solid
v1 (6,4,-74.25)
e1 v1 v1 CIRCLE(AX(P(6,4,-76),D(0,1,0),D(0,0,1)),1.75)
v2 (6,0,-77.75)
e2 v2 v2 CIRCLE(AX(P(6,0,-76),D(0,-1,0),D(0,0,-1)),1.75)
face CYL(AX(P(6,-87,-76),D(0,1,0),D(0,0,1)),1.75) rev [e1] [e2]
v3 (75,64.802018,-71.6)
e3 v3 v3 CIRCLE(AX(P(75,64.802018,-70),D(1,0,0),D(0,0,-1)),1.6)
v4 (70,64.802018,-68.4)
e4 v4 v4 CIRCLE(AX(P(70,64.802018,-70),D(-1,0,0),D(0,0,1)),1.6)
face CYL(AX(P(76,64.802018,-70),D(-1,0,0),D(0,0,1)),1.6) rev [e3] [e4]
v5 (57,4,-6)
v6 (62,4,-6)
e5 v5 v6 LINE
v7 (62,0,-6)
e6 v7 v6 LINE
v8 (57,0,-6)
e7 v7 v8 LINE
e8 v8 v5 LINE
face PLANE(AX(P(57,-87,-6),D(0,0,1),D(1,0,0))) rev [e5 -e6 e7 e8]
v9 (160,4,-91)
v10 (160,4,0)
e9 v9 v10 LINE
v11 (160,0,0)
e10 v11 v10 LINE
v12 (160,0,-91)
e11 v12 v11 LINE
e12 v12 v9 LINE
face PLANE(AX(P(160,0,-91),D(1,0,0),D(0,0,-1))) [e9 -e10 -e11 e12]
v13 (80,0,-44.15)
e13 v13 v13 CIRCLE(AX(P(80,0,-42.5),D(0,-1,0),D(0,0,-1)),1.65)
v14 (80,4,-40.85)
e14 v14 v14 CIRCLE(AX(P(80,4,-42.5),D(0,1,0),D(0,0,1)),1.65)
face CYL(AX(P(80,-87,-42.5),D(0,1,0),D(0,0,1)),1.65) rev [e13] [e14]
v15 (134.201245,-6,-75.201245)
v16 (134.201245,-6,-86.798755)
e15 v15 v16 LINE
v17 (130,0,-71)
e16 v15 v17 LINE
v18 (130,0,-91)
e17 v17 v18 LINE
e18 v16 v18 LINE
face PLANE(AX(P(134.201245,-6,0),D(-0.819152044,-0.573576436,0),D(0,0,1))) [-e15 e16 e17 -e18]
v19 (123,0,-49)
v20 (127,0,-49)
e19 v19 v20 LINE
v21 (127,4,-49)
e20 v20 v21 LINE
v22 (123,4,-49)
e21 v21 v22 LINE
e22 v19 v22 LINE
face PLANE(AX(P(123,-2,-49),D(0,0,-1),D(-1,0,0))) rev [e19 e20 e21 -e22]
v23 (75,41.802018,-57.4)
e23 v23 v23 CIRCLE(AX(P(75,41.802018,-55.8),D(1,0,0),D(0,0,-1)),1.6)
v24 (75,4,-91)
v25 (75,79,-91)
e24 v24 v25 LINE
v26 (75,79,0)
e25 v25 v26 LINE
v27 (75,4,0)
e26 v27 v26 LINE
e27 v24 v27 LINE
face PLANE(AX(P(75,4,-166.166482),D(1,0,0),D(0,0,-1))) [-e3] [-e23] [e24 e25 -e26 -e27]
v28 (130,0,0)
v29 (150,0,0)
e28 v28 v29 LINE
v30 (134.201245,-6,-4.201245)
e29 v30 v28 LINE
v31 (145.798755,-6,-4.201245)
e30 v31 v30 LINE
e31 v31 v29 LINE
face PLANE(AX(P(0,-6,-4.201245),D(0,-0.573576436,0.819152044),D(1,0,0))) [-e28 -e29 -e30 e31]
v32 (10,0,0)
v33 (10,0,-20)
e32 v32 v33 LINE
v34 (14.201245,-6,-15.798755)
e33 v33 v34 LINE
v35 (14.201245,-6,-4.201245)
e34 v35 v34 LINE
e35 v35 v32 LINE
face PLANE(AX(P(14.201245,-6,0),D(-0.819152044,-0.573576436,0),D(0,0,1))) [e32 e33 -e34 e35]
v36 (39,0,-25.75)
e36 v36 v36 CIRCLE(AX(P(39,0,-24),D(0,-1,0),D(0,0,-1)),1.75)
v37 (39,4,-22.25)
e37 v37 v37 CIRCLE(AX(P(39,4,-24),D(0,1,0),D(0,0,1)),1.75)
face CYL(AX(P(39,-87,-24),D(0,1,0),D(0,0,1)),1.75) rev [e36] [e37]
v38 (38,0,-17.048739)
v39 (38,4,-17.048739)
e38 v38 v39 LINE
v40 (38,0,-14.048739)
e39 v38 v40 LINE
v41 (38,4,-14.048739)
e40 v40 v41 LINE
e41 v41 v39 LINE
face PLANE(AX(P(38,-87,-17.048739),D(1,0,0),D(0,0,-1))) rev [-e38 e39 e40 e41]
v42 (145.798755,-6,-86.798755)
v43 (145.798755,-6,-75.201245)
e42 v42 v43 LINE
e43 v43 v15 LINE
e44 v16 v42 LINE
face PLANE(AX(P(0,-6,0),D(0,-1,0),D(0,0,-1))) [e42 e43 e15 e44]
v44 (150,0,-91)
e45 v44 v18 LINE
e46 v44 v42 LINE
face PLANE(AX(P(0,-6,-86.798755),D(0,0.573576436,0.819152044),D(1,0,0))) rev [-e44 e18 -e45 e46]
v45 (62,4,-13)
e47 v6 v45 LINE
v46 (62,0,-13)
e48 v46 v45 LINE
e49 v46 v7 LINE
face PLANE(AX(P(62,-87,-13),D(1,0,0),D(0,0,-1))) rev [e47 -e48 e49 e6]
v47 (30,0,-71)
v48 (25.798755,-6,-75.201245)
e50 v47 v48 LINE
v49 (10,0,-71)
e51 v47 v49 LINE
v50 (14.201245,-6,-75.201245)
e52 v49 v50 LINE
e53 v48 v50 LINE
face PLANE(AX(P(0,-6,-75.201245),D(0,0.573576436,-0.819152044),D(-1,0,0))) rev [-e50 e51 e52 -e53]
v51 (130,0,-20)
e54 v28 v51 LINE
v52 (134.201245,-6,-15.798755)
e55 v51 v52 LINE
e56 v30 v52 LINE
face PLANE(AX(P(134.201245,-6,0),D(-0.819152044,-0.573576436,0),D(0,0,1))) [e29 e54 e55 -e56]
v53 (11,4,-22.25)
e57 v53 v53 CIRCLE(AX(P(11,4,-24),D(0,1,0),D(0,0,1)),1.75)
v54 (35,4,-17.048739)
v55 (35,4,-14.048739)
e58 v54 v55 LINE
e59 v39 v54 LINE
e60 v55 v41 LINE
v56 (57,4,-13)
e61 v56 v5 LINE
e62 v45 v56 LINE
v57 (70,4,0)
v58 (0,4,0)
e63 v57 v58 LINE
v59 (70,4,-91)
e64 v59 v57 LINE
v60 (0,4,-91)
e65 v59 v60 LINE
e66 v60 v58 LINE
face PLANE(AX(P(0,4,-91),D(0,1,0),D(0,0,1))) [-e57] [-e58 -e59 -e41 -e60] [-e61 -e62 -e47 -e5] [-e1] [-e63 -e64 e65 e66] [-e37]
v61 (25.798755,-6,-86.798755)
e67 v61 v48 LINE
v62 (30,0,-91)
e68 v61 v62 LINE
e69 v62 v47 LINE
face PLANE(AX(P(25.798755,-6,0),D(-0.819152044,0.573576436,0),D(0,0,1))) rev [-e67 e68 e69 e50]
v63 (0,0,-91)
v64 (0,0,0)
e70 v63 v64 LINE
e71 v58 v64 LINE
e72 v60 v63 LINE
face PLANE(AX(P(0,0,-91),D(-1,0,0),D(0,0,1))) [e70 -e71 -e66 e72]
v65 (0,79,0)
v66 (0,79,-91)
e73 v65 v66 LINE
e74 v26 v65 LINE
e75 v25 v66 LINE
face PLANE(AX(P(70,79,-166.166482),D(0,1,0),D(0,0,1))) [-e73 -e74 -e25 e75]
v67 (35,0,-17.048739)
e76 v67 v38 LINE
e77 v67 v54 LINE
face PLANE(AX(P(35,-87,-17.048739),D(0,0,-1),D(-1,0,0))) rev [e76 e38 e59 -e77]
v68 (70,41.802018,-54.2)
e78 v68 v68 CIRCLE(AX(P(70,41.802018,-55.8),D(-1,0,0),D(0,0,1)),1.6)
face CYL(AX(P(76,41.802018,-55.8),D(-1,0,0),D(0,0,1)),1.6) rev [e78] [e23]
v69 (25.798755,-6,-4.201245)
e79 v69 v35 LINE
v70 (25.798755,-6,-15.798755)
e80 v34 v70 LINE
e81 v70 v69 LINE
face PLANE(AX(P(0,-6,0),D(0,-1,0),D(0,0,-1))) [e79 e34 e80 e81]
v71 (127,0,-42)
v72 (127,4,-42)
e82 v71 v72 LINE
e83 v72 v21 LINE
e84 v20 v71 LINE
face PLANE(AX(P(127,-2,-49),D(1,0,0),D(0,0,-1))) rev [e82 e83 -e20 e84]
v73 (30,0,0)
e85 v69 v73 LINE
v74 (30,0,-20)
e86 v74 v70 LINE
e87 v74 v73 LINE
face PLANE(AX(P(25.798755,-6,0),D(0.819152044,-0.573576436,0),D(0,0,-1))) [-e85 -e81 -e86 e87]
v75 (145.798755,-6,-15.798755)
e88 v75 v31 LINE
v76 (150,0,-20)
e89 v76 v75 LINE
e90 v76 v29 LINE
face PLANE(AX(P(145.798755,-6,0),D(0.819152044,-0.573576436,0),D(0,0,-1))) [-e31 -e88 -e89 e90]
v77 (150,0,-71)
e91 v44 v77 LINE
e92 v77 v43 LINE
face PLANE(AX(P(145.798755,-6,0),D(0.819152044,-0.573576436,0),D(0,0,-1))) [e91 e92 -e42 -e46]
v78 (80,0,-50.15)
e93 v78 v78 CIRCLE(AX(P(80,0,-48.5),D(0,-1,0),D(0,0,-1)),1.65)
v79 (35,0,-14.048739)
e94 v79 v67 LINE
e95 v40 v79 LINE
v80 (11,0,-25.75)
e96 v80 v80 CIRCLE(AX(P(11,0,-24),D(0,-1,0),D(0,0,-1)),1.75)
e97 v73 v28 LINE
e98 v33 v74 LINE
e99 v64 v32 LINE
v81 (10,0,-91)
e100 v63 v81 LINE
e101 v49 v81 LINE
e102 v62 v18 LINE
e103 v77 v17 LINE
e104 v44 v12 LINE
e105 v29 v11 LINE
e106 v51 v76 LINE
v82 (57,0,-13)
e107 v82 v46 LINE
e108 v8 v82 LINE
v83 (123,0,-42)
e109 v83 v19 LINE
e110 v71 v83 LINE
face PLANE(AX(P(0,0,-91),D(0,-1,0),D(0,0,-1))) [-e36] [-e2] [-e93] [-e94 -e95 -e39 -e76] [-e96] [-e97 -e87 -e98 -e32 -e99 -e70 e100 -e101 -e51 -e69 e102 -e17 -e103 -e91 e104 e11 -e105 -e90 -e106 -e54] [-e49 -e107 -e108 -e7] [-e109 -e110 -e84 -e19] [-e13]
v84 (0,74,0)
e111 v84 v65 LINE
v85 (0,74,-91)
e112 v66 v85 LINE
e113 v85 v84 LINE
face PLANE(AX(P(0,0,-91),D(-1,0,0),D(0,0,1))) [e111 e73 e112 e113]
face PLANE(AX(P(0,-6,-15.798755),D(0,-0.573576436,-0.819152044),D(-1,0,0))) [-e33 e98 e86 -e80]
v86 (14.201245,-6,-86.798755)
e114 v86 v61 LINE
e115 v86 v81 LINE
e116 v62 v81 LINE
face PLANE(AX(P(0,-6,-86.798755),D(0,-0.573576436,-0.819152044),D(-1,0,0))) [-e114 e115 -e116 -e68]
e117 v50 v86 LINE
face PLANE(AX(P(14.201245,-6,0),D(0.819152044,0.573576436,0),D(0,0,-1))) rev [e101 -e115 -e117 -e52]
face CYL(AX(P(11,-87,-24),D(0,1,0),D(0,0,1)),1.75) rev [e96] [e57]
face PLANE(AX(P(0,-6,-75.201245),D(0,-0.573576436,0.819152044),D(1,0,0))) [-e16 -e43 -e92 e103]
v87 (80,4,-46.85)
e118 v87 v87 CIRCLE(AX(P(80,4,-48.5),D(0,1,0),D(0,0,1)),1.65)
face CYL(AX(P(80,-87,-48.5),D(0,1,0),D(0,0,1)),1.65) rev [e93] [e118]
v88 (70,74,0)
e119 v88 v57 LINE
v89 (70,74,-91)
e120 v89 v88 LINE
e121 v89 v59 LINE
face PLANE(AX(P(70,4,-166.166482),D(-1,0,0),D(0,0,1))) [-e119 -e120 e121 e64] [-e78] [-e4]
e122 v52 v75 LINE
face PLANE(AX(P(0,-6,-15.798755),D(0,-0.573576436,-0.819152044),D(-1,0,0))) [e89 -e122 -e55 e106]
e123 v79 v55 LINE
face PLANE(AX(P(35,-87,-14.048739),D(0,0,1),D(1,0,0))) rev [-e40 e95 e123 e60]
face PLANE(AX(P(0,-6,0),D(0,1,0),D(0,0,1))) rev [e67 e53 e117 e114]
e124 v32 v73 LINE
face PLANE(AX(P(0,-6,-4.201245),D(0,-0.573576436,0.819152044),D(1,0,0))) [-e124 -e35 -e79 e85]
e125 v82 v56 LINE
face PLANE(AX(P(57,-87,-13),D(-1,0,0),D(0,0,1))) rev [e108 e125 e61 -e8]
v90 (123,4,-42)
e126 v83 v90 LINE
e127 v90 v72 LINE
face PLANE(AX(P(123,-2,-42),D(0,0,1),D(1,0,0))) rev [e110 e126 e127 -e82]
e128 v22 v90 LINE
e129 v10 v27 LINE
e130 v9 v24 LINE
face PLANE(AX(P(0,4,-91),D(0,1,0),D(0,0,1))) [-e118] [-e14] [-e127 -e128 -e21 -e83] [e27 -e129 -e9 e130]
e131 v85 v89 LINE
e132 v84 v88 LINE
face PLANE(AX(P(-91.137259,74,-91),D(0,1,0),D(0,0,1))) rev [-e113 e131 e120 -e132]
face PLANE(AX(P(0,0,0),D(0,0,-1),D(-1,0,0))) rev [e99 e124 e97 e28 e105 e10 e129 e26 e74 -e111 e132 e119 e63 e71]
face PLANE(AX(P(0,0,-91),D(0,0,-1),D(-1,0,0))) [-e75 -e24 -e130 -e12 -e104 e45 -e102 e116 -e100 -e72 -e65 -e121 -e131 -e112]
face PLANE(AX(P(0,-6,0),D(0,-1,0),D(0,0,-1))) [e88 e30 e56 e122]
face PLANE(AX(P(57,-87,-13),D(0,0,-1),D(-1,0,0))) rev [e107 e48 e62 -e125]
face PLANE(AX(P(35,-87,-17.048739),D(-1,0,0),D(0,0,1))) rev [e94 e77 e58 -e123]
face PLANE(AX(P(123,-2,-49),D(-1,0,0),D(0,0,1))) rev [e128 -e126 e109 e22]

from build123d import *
from OCP.BRepFilletAPI import BRepFilletAPI_MakeChamfer

# Parameters (mm, degrees)
SKETCH1_W           = 160
SKETCH1_H           = 4
BOSS_EXTRUDE1_DEPTH = 91
SKETCH2_W           = 5
SKETCH2_H           = 75
BOSS_EXTRUDE2_DEPTH = 91
SKETCH3_W           = 91
SKETCH3_H           = 5
BOSS_EXTRUDE3_DEPTH = 70
SKETCH4_W           = 5
SKETCH4_H           = 7
CUT_EXTRUDE1_DEPTH  = 91
SKETCH5_R           = 1.75
CUT_EXTRUDE2_DEPTH  = 91
SKETCH6_W           = 3
SKETCH6_H           = 3
CUT_EXTRUDE3_DEPTH  = 91
SKETCH7_R           = 1.65
CUT_EXTRUDE4_DEPTH  = 91
SKETCH8_W           = 20
SKETCH8_H           = 20
BOSS_EXTRUDE4_DEPTH = 6
CHAMFER1_SIZE       = 6
CHAMFER1_SIZE_2     = 4.201245229
SKETCH9_W           = 20
SKETCH9_H           = 20
BOSS_EXTRUDE5_DEPTH = 6
CHAMFER2_SIZE       = 6
CHAMFER2_SIZE_2     = 4.201245229
SKETCH10_W          = 4
SKETCH10_H          = 7
CUT_EXTRUDE5_DEPTH  = 6
SKETCH11_R          = 1.6
CUT_EXTRUDE6_DEPTH  = 6


with BuildPart() as part:
    # Sketch1 → Boss-Extrude1 (new body)
    with BuildSketch(Plane.XY):
        with Locations((80, 2)):
            Rectangle(SKETCH1_W, SKETCH1_H)
    extrude(amount=-BOSS_EXTRUDE1_DEPTH)

    # Sketch2 → Boss-Extrude2 (add)
    with BuildSketch(Plane.XY):
        with Locations((72.5, 41.5)):
            Rectangle(SKETCH2_W, SKETCH2_H)
    extrude(amount=-BOSS_EXTRUDE2_DEPTH)

    # Sketch3 → Boss-Extrude3 (add)
    with BuildSketch(Plane.ZY.offset(-70)):
        with Locations((-45.5, 76.5)):
            Rectangle(SKETCH3_W, SKETCH3_H)
    extrude(amount=BOSS_EXTRUDE3_DEPTH)

    # Sketch4 → Cut-Extrude1 (cut)
    with BuildSketch(Plane(origin=(0, 4, 0), x_dir=(1, 0, 0), z_dir=(0, 1, 0))):
        with Locations((59.5, 9.5)):
            Rectangle(SKETCH4_W, SKETCH4_H)
    extrude(amount=-CUT_EXTRUDE1_DEPTH, mode=Mode.SUBTRACT)

    # Sketch5 → Cut-Extrude2 (cut)
    with BuildSketch(Plane(origin=(0, 4, 0), x_dir=(1, 0, 0), z_dir=(0, 1, 0))):
        with Locations(Location((11, 24, 0), (0, 0, 270))):
            Circle(SKETCH5_R)
        with Locations(Location((39, 24, 0), (0, 0, 270))):
            Circle(SKETCH5_R)
        with Locations(Location((6, 76, 0), (0, 0, 270))):
            Circle(SKETCH5_R)
    extrude(amount=-CUT_EXTRUDE2_DEPTH, mode=Mode.SUBTRACT)

    # Sketch6 → Cut-Extrude3 (cut)
    with BuildSketch(Plane(origin=(0, 4, 0), x_dir=(1, 0, 0), z_dir=(0, 1, 0))):
        with Locations((36.5, 15.548738613)):
            Rectangle(SKETCH6_W, SKETCH6_H)
    extrude(amount=-CUT_EXTRUDE3_DEPTH, mode=Mode.SUBTRACT)

    # Sketch7 → Cut-Extrude4 (cut)
    with BuildSketch(Plane(origin=(0, 4, 0), x_dir=(1, 0, 0), z_dir=(0, 1, 0))):
        with Locations(Location((80, 48.5, 0), (0, 0, 270))):
            Circle(SKETCH7_R)
        with Locations(Location((80, 42.5, 0), (0, 0, 270))):
            Circle(SKETCH7_R)
    extrude(amount=-CUT_EXTRUDE4_DEPTH, mode=Mode.SUBTRACT)

    # Sketch8 → Boss-Extrude4 (add)
    with BuildSketch(Plane.XZ):
        with Locations((20, -10)):
            Rectangle(SKETCH8_W, SKETCH8_H)
    extrude(amount=BOSS_EXTRUDE4_DEPTH)

    # Chamfer1
    chamfer1_edges_1 = [part.edges().sort_by_distance(p)[0] for p in [
        (30, -6, -10),
    ]]
    chamfer1_side_1 = [part.faces().sort_by_distance(p)[0] for p in [
        (30, -5.915975095, -10),
    ]]
    chamfer1_edges_2 = [part.edges().sort_by_distance(p)[0] for p in [
        (20, -6, -20),
    ]]
    chamfer1_side_2 = [part.faces().sort_by_distance(p)[0] for p in [
        (20, -5.915975095, -20),
    ]]
    chamfer1_edges_3 = [part.edges().sort_by_distance(p)[0] for p in [
        (10, -6, -10),
    ]]
    chamfer1_side_3 = [part.faces().sort_by_distance(p)[0] for p in [
        (10, -5.915975095, -10),
    ]]
    chamfer1_edges_4 = [part.edges().sort_by_distance(p)[0] for p in [
        (20, -6, 0),
    ]]
    chamfer1_side_4 = [part.faces().sort_by_distance(p)[0] for p in [
        (20, -5.915975095, 0),
    ]]
    chamfer1 = BRepFilletAPI_MakeChamfer(part.part.solid().wrapped)
    for e in chamfer1_edges_1:
        chamfer1.Add(CHAMFER1_SIZE - 0.0001, CHAMFER1_SIZE_2 - 0.0001, e.wrapped, chamfer1_side_1[0].wrapped)
    for e in chamfer1_edges_2:
        chamfer1.Add(CHAMFER1_SIZE - 0.0001, CHAMFER1_SIZE_2 - 0.0001, e.wrapped, chamfer1_side_2[0].wrapped)
    for e in chamfer1_edges_3:
        chamfer1.Add(CHAMFER1_SIZE - 0.0001, CHAMFER1_SIZE_2 - 0.0001, e.wrapped, chamfer1_side_3[0].wrapped)
    for e in chamfer1_edges_4:
        chamfer1.Add(CHAMFER1_SIZE - 0.0001, CHAMFER1_SIZE_2 - 0.0001, e.wrapped, chamfer1_side_4[0].wrapped)
    add(Compound.cast(chamfer1.Shape()), mode=Mode.REPLACE)  # a hair under: the kernel refuses the full size

    # Sketch9 → Boss-Extrude5 (add)
    with BuildSketch(Plane.XZ):
        with Locations((20, -81)):
            Rectangle(SKETCH9_W, SKETCH9_H)
        with Locations((140, -81)):
            Rectangle(SKETCH9_W, SKETCH9_H)
        with Locations((140, -10)):
            Rectangle(SKETCH9_W, SKETCH9_H)
    extrude(amount=BOSS_EXTRUDE5_DEPTH)

    # Chamfer2
    chamfer2_edges_1 = [part.edges().sort_by_distance(p)[0] for p in [
        (30, -6, -81),
    ]]
    chamfer2_side_1 = [part.faces().sort_by_distance(p)[0] for p in [
        (30, -5.915975095, -81),
    ]]
    chamfer2_edges_2 = [part.edges().sort_by_distance(p)[0] for p in [
        (20, -6, -91),
    ]]
    chamfer2_side_2 = [part.faces().sort_by_distance(p)[0] for p in [
        (20, -5.915975095, -91),
    ]]
    chamfer2_edges_3 = [part.edges().sort_by_distance(p)[0] for p in [
        (140, -6, -91),
    ]]
    chamfer2_side_3 = [part.faces().sort_by_distance(p)[0] for p in [
        (140, -5.915975095, -91),
    ]]
    chamfer2_edges_4 = [part.edges().sort_by_distance(p)[0] for p in [
        (10, -6, -81),
    ]]
    chamfer2_side_4 = [part.faces().sort_by_distance(p)[0] for p in [
        (10, -5.915975095, -81),
    ]]
    chamfer2_edges_5 = [part.edges().sort_by_distance(p)[0] for p in [
        (20, -6, -71),
    ]]
    chamfer2_side_5 = [part.faces().sort_by_distance(p)[0] for p in [
        (20, -5.915975095, -71),
    ]]
    chamfer2_edges_6 = [part.edges().sort_by_distance(p)[0] for p in [
        (150, -6, -81),
    ]]
    chamfer2_side_6 = [part.faces().sort_by_distance(p)[0] for p in [
        (150, -5.915975095, -81),
    ]]
    chamfer2_edges_7 = [part.edges().sort_by_distance(p)[0] for p in [
        (130, -6, -81),
    ]]
    chamfer2_side_7 = [part.faces().sort_by_distance(p)[0] for p in [
        (130, -5.915975095, -81),
    ]]
    chamfer2_edges_8 = [part.edges().sort_by_distance(p)[0] for p in [
        (140, -6, -71),
    ]]
    chamfer2_side_8 = [part.faces().sort_by_distance(p)[0] for p in [
        (140, -5.915975095, -71),
    ]]
    chamfer2_edges_9 = [part.edges().sort_by_distance(p)[0] for p in [
        (130, -6, -10),
    ]]
    chamfer2_side_9 = [part.faces().sort_by_distance(p)[0] for p in [
        (130, -5.915975095, -10),
    ]]
    chamfer2_edges_10 = [part.edges().sort_by_distance(p)[0] for p in [
        (140, -6, -20),
    ]]
    chamfer2_side_10 = [part.faces().sort_by_distance(p)[0] for p in [
        (140, -5.915975095, -20),
    ]]
    chamfer2_edges_11 = [part.edges().sort_by_distance(p)[0] for p in [
        (150, -6, -10),
    ]]
    chamfer2_side_11 = [part.faces().sort_by_distance(p)[0] for p in [
        (150, -5.915975095, -10),
    ]]
    chamfer2_edges_12 = [part.edges().sort_by_distance(p)[0] for p in [
        (140, -6, 0),
    ]]
    chamfer2_side_12 = [part.faces().sort_by_distance(p)[0] for p in [
        (140, -5.915975095, 0),
    ]]
    chamfer2 = BRepFilletAPI_MakeChamfer(part.part.solid().wrapped)
    for e in chamfer2_edges_1:
        chamfer2.Add(CHAMFER2_SIZE - 0.0001, CHAMFER2_SIZE_2 - 0.0001, e.wrapped, chamfer2_side_1[0].wrapped)
    for e in chamfer2_edges_2:
        chamfer2.Add(CHAMFER2_SIZE - 0.0001, CHAMFER2_SIZE_2 - 0.0001, e.wrapped, chamfer2_side_2[0].wrapped)
    for e in chamfer2_edges_3:
        chamfer2.Add(CHAMFER2_SIZE - 0.0001, CHAMFER2_SIZE_2 - 0.0001, e.wrapped, chamfer2_side_3[0].wrapped)
    for e in chamfer2_edges_4:
        chamfer2.Add(CHAMFER2_SIZE - 0.0001, CHAMFER2_SIZE_2 - 0.0001, e.wrapped, chamfer2_side_4[0].wrapped)
    for e in chamfer2_edges_5:
        chamfer2.Add(CHAMFER2_SIZE - 0.0001, CHAMFER2_SIZE_2 - 0.0001, e.wrapped, chamfer2_side_5[0].wrapped)
    for e in chamfer2_edges_6:
        chamfer2.Add(CHAMFER2_SIZE - 0.0001, CHAMFER2_SIZE_2 - 0.0001, e.wrapped, chamfer2_side_6[0].wrapped)
    for e in chamfer2_edges_7:
        chamfer2.Add(CHAMFER2_SIZE - 0.0001, CHAMFER2_SIZE_2 - 0.0001, e.wrapped, chamfer2_side_7[0].wrapped)
    for e in chamfer2_edges_8:
        chamfer2.Add(CHAMFER2_SIZE - 0.0001, CHAMFER2_SIZE_2 - 0.0001, e.wrapped, chamfer2_side_8[0].wrapped)
    for e in chamfer2_edges_9:
        chamfer2.Add(CHAMFER2_SIZE - 0.0001, CHAMFER2_SIZE_2 - 0.0001, e.wrapped, chamfer2_side_9[0].wrapped)
    for e in chamfer2_edges_10:
        chamfer2.Add(CHAMFER2_SIZE - 0.0001, CHAMFER2_SIZE_2 - 0.0001, e.wrapped, chamfer2_side_10[0].wrapped)
    for e in chamfer2_edges_11:
        chamfer2.Add(CHAMFER2_SIZE - 0.0001, CHAMFER2_SIZE_2 - 0.0001, e.wrapped, chamfer2_side_11[0].wrapped)
    for e in chamfer2_edges_12:
        chamfer2.Add(CHAMFER2_SIZE - 0.0001, CHAMFER2_SIZE_2 - 0.0001, e.wrapped, chamfer2_side_12[0].wrapped)
    add(Compound.cast(chamfer2.Shape()), mode=Mode.REPLACE)  # a hair under: the kernel refuses the full size

    # Sketch10 → Cut-Extrude5 (cut)
    with BuildSketch(Plane(origin=(0, 4, 0), x_dir=(1, 0, 0), z_dir=(0, 1, 0))):
        with Locations((125, 45.5)):
            Rectangle(SKETCH10_W, SKETCH10_H)
    extrude(amount=-CUT_EXTRUDE5_DEPTH, mode=Mode.SUBTRACT)

    # Sketch11 → Cut-Extrude6 (cut)
    with BuildSketch(Plane.ZY.offset(-70)):
        with Locations((-70, 64.80201774)):
            Circle(SKETCH11_R)
        with Locations((-55.8, 41.80201774)):
            Circle(SKETCH11_R)
    extrude(amount=-CUT_EXTRUDE6_DEPTH, mode=Mode.SUBTRACT)


solid = part.part
